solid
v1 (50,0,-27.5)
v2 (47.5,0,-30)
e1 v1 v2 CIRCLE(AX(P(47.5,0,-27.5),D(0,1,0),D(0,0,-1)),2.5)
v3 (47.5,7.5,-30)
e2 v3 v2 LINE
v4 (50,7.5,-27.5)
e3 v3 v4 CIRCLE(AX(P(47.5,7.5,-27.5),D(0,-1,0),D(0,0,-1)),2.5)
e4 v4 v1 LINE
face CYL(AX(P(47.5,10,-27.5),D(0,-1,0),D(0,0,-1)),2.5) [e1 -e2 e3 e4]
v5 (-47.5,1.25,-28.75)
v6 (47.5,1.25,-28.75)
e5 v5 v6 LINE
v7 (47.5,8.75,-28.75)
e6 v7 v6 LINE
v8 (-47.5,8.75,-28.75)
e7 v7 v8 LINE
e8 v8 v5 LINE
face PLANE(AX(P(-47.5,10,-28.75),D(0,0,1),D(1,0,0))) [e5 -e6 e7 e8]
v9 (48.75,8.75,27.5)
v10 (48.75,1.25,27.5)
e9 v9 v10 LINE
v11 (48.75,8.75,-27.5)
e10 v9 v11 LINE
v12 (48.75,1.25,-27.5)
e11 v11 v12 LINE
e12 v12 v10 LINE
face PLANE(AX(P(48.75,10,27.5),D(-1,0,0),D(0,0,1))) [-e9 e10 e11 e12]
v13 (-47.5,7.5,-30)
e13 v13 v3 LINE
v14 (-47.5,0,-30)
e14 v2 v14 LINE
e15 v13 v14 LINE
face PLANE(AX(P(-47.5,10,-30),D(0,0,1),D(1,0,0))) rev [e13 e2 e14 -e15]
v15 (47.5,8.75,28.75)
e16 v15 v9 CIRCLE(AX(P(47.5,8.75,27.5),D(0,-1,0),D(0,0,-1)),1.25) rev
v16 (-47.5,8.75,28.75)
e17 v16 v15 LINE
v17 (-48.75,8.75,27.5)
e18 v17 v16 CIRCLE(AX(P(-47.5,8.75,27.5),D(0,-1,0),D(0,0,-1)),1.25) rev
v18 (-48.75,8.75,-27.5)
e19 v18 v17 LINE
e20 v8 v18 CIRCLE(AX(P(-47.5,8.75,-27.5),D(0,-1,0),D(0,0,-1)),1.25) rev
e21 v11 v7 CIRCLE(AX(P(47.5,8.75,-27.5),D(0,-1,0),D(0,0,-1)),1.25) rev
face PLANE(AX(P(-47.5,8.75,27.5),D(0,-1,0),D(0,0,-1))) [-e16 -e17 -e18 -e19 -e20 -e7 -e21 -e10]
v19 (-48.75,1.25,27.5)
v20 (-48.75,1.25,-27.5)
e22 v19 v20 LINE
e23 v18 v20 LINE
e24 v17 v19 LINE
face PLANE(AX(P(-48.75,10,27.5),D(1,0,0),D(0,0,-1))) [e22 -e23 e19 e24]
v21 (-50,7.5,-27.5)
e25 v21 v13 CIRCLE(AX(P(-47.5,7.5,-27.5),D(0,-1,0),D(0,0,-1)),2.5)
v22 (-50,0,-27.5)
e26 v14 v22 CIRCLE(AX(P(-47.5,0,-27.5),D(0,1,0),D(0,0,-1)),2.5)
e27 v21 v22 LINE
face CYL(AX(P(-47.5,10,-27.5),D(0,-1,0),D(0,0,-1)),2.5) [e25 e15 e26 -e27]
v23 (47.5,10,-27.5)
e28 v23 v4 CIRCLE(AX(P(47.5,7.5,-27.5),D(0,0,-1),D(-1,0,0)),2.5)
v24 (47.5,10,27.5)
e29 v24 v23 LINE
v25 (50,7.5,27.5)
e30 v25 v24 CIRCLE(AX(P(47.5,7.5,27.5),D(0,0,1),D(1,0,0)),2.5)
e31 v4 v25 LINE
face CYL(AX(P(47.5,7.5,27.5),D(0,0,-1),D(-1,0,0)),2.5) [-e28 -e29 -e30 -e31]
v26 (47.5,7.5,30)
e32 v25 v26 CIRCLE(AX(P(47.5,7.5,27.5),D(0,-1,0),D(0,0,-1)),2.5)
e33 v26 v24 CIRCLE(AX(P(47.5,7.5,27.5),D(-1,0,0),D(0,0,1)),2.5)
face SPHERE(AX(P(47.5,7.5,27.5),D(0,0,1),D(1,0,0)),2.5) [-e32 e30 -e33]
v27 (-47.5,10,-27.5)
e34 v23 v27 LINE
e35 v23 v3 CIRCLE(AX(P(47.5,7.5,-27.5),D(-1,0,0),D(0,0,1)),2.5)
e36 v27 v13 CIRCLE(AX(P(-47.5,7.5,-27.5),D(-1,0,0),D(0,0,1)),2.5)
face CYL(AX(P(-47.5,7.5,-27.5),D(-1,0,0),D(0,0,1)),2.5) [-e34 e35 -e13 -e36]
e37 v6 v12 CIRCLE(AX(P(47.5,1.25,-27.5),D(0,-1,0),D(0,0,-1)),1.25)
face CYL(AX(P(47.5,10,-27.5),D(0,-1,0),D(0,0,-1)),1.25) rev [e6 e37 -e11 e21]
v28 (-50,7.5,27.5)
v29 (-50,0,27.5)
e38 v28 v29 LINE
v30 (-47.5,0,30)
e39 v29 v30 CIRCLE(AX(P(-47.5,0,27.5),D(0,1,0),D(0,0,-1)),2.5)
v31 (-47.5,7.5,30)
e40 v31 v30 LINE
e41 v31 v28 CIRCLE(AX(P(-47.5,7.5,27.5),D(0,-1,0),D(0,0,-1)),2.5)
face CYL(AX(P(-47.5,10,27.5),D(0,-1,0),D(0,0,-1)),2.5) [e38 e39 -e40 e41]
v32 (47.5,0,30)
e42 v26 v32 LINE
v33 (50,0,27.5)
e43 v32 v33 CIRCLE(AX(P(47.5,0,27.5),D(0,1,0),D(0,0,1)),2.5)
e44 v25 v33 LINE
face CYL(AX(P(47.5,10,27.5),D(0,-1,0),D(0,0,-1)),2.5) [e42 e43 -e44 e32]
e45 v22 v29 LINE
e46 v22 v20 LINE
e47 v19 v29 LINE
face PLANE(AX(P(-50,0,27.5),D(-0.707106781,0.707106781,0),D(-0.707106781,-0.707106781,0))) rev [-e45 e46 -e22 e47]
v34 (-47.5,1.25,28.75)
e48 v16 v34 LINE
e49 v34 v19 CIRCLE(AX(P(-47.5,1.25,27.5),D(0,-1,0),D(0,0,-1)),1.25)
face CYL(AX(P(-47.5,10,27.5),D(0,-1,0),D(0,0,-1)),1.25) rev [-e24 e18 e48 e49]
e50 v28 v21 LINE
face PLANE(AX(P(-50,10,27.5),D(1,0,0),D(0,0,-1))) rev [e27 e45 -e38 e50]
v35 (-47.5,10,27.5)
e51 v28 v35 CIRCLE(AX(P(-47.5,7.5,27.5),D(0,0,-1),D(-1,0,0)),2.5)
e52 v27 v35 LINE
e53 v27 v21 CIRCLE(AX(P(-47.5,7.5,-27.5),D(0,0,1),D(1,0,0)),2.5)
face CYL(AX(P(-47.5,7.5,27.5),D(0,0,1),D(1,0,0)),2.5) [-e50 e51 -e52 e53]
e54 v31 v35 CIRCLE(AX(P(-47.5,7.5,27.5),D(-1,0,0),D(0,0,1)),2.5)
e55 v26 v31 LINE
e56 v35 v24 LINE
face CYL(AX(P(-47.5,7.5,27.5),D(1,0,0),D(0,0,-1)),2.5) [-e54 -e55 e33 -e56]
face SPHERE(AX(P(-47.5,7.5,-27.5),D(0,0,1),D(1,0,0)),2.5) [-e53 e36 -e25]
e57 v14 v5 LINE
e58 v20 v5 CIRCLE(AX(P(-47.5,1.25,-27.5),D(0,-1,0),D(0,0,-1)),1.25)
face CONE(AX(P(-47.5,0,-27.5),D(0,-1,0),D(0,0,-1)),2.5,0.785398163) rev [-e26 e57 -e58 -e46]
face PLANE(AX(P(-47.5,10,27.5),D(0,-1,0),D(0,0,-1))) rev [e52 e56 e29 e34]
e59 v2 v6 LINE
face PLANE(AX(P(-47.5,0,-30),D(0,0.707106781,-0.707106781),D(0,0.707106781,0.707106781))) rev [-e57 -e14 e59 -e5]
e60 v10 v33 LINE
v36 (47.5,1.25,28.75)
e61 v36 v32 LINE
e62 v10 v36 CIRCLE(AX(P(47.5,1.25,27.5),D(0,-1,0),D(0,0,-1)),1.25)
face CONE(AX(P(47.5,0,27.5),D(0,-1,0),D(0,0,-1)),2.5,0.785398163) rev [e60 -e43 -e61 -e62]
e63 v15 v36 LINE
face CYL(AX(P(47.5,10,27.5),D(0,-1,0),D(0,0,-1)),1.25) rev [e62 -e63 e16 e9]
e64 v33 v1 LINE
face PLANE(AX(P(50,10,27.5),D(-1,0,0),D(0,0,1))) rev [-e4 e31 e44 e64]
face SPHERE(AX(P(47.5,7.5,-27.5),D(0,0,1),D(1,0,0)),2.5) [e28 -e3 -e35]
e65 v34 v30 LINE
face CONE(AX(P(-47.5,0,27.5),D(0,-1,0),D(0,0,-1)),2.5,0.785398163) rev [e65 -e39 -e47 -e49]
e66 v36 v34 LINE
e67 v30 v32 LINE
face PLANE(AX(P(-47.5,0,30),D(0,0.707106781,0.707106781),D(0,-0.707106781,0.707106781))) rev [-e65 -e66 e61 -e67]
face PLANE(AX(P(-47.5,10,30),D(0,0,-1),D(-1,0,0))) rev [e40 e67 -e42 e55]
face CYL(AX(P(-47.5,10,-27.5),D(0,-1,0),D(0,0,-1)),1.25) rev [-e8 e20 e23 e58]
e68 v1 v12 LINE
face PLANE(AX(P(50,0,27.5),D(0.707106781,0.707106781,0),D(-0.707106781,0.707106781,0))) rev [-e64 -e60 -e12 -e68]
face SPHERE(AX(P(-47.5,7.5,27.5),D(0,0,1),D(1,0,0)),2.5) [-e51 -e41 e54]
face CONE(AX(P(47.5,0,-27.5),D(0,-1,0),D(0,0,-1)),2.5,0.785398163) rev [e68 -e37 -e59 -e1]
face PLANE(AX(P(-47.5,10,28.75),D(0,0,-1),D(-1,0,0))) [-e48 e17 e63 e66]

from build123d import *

# Parameters (mm, degrees)
BOSS_EXTRUDE1_DEPTH = 10
SHELL1_T            = -1.25
FILLET1_R           = 2.5
CHAMFER1_SIZE       = 1.25


with BuildPart() as part:
    # Sketch1 → Boss-Extrude1 (new body)
    with BuildSketch(Plane(origin=(0, 0, 0), x_dir=(1, 0, 0), z_dir=(0, 1, 0))):
        with BuildLine():
            Line((-47.5, -30), (47.5, -30))
            ThreePointArc((47.5, -30), (49.267766953, -29.267766953), (50, -27.5))
            Line((50, -27.5), (50, 27.5))
            ThreePointArc((50, 27.5), (49.267766953, 29.267766953), (47.5, 30))
            Line((47.5, 30), (-47.5, 30))
            ThreePointArc((-47.5, 30), (-49.267766953, 29.267766953), (-50, 27.5))
            Line((-50, 27.5), (-50, -27.5))
            ThreePointArc((-50, -27.5), (-49.267766953, -29.267766953), (-47.5, -30))
        make_face()
    extrude(amount=BOSS_EXTRUDE1_DEPTH)

    # Shell1
    shell1_openings = [part.faces().sort_by_distance(p)[0] for p in [
        (0, 0, 0),
    ]]
    offset(amount=SHELL1_T, openings=shell1_openings, kind=Kind.INTERSECTION)

    # Fillet1
    fillet1_edges = [part.edges().sort_by_distance(p)[0] for p in [
        (49.267766953, 10, 29.267766953),
        (50, 10, 0),
        (49.267766953, 10, -29.267766953),
        (0, 10, -30),
        (-49.267766953, 10, -29.267766953),
        (-50, 10, 0),
        (-49.267766953, 10, 29.267766953),
        (0, 10, 30),
    ]]
    fillet(fillet1_edges, radius=FILLET1_R)

    # Chamfer1
    chamfer1_edges = [part.edges().sort_by_distance(p)[0] for p in [
        (-48.383883476, 0, 28.383883476),
        (0, 0, 28.75),
        (48.383883476, 0, 28.383883476),
        (48.75, 0, 0),
        (48.383883476, 0, -28.383883476),
        (0, 0, -28.75),
        (-48.383883476, 0, -28.383883476),
        (-48.75, 0, 0),
    ]]
    chamfer(chamfer1_edges, length=CHAMFER1_SIZE - 0.0001)  # a hair under: the kernel refuses the full size


solid = part.part
